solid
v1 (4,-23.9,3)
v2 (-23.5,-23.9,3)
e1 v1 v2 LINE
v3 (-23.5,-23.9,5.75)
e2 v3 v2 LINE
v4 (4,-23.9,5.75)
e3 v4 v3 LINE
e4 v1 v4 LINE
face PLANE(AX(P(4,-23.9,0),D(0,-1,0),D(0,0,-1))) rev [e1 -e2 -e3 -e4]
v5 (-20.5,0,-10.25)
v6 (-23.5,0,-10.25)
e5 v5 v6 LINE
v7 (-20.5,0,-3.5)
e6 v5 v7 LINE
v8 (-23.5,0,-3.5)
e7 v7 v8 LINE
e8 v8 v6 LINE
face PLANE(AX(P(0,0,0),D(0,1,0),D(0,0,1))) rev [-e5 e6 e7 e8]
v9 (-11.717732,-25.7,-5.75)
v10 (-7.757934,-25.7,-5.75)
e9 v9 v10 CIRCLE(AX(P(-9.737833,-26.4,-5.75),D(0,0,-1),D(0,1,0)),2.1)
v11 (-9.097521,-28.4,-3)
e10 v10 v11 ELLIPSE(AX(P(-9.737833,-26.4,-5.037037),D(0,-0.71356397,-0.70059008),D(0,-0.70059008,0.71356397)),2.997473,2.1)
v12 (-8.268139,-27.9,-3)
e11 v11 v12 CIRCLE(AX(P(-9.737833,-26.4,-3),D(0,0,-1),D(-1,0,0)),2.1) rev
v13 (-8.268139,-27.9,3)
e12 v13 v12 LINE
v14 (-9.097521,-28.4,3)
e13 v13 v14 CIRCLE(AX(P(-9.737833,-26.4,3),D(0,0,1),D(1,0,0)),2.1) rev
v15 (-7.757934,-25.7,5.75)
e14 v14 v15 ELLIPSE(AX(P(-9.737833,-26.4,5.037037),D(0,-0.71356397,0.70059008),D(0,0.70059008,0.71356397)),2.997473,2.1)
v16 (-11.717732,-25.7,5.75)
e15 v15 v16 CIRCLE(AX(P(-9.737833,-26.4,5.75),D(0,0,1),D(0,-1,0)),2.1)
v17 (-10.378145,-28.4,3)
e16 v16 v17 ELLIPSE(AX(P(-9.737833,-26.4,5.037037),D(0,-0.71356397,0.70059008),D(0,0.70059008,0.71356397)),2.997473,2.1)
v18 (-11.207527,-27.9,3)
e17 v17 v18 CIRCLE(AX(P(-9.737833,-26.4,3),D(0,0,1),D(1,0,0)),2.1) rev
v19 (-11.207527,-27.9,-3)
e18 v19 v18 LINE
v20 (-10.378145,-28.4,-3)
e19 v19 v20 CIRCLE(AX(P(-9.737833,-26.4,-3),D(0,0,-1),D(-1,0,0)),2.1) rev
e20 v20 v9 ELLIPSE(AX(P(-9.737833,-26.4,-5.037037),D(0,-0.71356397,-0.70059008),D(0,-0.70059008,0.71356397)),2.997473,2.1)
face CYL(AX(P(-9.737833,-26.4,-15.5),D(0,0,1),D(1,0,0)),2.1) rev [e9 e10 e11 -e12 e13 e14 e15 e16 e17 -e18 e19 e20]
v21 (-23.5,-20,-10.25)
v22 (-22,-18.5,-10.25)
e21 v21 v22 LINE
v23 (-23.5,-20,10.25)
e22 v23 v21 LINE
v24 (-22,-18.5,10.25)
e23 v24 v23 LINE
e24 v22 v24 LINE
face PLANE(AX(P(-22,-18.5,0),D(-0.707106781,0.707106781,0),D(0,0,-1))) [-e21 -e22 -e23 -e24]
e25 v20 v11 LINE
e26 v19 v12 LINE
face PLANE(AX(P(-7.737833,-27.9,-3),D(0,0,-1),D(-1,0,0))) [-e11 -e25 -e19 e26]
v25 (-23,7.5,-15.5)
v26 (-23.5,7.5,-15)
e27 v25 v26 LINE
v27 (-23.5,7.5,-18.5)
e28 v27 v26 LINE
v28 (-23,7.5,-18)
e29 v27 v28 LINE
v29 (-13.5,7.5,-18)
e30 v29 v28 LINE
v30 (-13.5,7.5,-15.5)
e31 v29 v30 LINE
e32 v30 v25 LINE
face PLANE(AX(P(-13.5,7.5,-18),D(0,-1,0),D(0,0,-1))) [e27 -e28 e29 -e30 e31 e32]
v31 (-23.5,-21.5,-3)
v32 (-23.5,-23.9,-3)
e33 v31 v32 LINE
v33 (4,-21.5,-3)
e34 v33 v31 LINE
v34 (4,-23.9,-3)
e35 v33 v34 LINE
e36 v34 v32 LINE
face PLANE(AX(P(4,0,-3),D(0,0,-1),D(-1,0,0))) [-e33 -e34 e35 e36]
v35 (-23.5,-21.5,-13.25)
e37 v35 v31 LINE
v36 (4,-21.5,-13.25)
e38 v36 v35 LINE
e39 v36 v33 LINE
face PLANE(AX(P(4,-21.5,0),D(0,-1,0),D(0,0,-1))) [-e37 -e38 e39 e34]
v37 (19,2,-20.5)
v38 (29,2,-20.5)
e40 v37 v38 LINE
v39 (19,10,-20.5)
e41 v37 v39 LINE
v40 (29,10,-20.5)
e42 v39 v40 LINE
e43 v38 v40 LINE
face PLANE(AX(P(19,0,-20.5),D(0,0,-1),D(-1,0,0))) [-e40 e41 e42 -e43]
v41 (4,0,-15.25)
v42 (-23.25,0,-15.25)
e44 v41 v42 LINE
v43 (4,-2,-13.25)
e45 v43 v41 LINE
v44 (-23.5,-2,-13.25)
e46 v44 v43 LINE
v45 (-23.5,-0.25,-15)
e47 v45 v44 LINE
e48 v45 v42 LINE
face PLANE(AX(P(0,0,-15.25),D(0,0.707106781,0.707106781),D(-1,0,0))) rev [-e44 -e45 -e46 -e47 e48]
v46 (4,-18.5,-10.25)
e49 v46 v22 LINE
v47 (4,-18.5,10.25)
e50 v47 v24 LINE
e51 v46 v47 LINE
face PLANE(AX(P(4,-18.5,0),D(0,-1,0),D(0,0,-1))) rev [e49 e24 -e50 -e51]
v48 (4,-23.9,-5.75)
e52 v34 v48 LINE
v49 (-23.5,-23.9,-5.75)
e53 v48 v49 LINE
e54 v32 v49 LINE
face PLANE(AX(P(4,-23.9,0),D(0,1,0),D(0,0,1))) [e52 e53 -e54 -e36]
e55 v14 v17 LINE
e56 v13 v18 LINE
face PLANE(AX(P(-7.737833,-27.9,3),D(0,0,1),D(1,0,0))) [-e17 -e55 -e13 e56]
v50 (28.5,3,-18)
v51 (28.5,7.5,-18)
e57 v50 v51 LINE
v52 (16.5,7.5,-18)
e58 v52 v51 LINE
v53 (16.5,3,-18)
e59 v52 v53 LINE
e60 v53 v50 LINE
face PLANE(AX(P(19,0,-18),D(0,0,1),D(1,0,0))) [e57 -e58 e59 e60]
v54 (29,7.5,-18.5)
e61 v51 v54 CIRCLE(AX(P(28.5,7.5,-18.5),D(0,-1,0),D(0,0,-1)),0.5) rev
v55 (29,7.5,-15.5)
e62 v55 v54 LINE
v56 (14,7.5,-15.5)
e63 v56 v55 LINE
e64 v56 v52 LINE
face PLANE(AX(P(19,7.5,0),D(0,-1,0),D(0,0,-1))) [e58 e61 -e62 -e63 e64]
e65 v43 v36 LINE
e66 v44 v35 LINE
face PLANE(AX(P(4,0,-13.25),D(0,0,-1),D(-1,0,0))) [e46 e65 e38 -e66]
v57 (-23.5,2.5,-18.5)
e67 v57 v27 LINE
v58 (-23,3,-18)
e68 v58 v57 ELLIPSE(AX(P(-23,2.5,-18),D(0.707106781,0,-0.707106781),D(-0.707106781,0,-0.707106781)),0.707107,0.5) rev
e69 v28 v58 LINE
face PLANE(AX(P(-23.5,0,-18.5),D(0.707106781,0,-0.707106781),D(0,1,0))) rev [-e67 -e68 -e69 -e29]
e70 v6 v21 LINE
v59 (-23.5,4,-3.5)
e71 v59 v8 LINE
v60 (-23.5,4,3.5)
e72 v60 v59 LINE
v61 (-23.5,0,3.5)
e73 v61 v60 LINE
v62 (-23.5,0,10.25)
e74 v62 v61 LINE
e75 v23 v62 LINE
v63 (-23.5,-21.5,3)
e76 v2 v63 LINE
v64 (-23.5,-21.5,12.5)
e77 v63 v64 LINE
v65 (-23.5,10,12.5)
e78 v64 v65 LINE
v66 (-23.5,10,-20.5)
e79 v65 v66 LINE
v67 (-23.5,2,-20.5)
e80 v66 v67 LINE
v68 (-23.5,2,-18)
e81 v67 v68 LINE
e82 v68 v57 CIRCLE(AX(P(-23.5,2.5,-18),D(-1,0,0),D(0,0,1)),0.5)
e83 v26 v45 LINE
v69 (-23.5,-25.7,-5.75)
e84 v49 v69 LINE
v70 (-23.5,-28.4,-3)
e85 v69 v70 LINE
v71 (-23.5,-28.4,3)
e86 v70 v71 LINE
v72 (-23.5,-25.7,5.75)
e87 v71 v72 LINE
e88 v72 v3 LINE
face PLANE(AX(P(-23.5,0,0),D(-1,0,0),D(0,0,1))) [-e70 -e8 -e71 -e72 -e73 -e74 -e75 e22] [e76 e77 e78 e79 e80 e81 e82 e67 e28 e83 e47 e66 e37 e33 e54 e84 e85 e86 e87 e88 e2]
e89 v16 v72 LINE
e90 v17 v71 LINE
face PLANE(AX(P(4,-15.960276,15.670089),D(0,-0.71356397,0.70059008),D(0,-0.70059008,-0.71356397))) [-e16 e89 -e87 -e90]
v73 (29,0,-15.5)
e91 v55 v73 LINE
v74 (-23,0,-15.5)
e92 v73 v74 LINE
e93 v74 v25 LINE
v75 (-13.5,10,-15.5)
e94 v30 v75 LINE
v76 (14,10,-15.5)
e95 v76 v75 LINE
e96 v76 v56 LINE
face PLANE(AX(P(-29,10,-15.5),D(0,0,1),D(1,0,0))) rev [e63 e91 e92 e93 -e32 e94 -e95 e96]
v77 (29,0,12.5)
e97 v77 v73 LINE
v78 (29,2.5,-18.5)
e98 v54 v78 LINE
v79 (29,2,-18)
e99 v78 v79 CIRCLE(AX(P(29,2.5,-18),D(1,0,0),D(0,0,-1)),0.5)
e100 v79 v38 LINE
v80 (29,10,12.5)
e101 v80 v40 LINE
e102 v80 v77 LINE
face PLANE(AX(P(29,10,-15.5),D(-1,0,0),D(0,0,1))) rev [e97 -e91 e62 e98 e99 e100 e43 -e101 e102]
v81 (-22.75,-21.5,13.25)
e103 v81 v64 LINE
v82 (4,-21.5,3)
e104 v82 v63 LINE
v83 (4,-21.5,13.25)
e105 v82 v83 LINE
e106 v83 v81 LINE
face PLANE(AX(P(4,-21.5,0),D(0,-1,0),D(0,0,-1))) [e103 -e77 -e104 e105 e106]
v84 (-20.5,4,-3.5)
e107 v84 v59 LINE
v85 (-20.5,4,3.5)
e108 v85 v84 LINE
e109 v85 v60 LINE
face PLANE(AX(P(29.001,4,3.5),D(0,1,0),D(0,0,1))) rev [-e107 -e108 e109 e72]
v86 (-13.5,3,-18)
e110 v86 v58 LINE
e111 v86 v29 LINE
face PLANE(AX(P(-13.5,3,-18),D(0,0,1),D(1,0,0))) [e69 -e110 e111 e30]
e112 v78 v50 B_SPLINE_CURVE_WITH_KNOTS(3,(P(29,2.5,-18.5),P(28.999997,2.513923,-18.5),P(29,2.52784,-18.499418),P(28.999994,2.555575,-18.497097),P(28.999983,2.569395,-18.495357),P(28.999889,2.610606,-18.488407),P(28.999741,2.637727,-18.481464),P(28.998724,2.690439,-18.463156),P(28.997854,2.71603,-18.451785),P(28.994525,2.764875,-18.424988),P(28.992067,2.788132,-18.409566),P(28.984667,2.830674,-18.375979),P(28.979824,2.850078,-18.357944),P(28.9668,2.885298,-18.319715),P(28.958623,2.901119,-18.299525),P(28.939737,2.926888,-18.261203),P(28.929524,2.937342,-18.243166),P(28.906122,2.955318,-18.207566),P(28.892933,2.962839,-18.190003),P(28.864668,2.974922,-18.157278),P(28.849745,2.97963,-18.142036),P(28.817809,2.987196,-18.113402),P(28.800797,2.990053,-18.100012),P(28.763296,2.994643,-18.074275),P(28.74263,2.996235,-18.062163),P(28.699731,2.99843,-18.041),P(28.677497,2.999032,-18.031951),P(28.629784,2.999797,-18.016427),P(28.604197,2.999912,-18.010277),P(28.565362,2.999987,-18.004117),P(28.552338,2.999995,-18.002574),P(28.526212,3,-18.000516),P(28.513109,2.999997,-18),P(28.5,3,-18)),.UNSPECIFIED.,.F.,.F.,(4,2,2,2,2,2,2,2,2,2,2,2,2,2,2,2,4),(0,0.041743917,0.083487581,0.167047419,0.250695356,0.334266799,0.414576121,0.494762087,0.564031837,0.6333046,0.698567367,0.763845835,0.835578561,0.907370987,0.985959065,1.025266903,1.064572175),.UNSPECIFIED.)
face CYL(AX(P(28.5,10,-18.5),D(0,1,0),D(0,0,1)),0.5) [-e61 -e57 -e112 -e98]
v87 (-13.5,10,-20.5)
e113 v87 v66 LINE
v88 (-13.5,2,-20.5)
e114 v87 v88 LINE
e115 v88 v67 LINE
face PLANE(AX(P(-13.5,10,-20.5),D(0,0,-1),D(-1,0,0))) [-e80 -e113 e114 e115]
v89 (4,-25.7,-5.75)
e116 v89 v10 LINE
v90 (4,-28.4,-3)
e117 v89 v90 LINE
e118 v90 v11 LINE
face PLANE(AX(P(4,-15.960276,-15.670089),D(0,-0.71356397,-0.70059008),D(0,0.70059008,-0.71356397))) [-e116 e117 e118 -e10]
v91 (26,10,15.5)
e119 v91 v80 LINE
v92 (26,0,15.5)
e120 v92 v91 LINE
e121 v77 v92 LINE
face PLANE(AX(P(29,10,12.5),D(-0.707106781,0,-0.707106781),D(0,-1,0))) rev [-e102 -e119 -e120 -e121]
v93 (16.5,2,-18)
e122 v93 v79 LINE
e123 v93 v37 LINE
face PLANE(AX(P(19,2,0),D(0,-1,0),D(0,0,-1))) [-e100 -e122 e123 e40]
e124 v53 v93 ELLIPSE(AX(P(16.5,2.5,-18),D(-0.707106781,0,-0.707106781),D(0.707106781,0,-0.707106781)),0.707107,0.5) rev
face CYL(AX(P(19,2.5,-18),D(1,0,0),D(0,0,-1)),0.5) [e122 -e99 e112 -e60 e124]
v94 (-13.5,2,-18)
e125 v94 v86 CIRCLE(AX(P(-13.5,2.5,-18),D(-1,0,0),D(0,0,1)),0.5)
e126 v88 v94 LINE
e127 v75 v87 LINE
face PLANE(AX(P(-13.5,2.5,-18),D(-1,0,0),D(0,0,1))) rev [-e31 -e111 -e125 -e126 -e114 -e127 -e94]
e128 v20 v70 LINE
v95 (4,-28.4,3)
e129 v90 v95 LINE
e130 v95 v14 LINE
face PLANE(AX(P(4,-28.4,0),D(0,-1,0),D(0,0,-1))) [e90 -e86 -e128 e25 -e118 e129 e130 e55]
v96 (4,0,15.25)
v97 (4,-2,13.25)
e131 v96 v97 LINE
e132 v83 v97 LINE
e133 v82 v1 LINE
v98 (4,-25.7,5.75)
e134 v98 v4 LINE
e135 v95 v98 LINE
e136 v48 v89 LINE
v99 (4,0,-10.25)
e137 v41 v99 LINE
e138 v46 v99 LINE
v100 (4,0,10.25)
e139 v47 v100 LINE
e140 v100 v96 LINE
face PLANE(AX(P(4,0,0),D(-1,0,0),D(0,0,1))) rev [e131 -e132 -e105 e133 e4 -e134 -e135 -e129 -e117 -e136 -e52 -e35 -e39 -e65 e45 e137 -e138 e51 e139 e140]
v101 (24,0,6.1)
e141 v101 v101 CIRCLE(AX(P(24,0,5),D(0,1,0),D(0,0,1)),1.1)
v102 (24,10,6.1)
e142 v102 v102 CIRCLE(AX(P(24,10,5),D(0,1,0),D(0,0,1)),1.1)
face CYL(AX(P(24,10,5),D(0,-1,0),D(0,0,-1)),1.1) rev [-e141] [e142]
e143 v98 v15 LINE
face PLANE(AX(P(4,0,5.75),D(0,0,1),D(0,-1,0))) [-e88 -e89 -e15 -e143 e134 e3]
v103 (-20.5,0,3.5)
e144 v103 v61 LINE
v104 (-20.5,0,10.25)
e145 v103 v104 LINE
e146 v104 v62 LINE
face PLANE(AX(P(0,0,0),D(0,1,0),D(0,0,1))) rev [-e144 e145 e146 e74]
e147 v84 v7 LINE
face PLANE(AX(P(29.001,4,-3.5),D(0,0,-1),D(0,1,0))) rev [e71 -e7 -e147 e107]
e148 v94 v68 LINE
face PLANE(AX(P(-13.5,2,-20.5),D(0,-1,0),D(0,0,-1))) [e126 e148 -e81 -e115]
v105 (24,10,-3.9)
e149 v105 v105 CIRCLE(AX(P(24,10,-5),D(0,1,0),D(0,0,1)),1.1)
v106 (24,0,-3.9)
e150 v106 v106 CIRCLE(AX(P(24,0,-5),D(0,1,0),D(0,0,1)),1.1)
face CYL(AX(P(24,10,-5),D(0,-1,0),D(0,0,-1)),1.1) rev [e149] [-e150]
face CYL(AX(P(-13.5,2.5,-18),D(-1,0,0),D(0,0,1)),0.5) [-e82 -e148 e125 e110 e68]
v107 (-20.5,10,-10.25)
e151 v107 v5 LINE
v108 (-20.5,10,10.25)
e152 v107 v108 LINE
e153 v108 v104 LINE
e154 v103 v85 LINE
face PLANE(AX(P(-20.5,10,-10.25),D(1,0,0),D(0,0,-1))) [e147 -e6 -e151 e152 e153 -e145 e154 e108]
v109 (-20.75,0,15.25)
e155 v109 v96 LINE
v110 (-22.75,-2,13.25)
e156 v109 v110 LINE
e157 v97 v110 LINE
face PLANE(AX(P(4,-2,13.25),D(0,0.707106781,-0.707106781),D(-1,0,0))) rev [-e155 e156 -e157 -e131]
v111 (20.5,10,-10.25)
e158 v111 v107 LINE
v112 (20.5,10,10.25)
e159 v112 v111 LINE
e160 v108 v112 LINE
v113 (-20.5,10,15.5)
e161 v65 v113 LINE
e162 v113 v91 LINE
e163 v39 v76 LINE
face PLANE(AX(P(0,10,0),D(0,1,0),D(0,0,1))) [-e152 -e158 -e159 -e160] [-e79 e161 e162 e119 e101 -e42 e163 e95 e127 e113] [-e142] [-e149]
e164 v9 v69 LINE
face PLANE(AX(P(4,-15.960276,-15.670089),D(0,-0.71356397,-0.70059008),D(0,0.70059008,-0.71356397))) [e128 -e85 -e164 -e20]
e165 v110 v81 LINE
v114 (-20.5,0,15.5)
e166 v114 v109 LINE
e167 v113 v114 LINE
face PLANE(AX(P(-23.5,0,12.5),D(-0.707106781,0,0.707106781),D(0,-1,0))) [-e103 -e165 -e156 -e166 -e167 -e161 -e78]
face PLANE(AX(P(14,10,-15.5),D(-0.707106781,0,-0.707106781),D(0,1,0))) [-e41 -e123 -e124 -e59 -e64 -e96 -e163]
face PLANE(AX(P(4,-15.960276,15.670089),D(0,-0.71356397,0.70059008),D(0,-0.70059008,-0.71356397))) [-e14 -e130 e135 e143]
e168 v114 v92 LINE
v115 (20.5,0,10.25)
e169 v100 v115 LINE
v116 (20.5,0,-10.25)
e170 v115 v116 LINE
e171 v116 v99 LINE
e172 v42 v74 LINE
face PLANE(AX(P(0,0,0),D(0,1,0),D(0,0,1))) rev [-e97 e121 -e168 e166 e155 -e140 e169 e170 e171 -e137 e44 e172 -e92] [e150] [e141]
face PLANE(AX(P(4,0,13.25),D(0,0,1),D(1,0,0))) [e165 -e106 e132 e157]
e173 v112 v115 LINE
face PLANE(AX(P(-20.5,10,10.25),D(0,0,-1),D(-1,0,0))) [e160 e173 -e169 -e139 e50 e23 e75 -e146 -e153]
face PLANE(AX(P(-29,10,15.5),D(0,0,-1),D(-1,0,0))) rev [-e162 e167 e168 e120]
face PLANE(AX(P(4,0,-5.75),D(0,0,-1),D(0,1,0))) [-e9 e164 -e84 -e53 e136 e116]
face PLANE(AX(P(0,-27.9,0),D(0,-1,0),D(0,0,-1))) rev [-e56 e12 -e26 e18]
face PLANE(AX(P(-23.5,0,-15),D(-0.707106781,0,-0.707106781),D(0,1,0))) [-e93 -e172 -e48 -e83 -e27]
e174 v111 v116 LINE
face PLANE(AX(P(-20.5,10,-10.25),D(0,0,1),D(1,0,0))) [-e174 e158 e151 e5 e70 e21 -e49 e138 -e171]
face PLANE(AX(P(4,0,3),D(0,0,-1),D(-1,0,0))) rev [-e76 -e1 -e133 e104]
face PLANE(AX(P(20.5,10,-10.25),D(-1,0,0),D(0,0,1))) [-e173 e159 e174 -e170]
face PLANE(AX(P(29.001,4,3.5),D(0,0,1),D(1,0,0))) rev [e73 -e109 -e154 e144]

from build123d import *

# Parameters (mm, degrees)
CROQUIS1_W              = 58
CROQUIS1_H              = 31
CROQUIS1_R              = 1.1
CROQUIS1_W_2            = 41
CROQUIS1_H_2            = 20.5
SALIENTE_EXTRUIR1_DEPTH = 10
SALIENTE_EXTRUIR2_DEPTH = 33
CROQUIS3_R              = 2.1
CORTAR_EXTRUIR1_DEPTH   = 50.740551867
CROQUIS4_W              = 20.5
CROQUIS4_H              = 18.5
CORTAR_EXTRUIR2_DEPTH   = 5.5
CHAFL_N1_SIZE           = 1.5
CHAFL_N2_SIZE           = 2
CROQUIS5_W              = 3
CROQUIS5_H              = 20.5
SALIENTE_EXTRUIR3_DEPTH = 10
CORTAR_EXTRUIR3_REACH   = 63.669
CROQUIS6_W              = 7
CROQUIS6_H              = 4
CROQUIS7_W              = 4
CROQUIS7_H              = 6
SALIENTE_EXTRUIR4_DEPTH = 0.5
CHAFL_N3_SIZE           = 3
SALIENTE_EXTRUIR5_DEPTH = 10
REDONDEO1_R             = 0.5
SALIENTE_EXTRUIR6_START = -10
SALIENTE_EXTRUIR6_DEPTH = 10
CHAFL_N5_SIZE           = 0.5
CHAFL_N6_SIZE           = 5


with BuildPart() as part:
    # Croquis1 → Saliente-Extruir1 (new body)
    with BuildSketch(Plane(origin=(0, 0, 0), x_dir=(1, 0, 0), z_dir=(0, 1, 0))):
        Rectangle(CROQUIS1_W, CROQUIS1_H)
        with Locations(Location((-24, -5, 0), (0, 0, 270))):
            Circle(CROQUIS1_R, mode=Mode.SUBTRACT)
        with Locations(Location((24, -5, 0), (0, 0, 270))):
            Circle(CROQUIS1_R, mode=Mode.SUBTRACT)
        with Locations(Location((24, 5, 0), (0, 0, 270))):
            Circle(CROQUIS1_R, mode=Mode.SUBTRACT)
        with Locations(Location((-24, 5, 0), (0, 0, 270))):
            Circle(CROQUIS1_R, mode=Mode.SUBTRACT)
        Rectangle(CROQUIS1_W_2, CROQUIS1_H_2, mode=Mode.SUBTRACT)
    extrude(amount=SALIENTE_EXTRUIR1_DEPTH)

    # Croquis2 → Saliente-Extruir2 (add)
    with BuildSketch(Plane.ZY.offset(29)):
        Polygon((10.25, -18.5), (-10.25, -18.5), (-10.25, 0), (-13.25, 0), (-13.25, -21.5), (-3, -21.5), (-3, -23.9), (-5.75, -23.9), (-5.75, -25.7), (-3, -28.4), (3, -28.4), (5.75, -25.7), (5.75, -23.9), (3, -23.9), (3, -21.5), (13.25, -21.5), (13.25, 0), (10.25, 0), align=None)
    extrude(amount=-SALIENTE_EXTRUIR2_DEPTH)

    # Croquis3 → Cortar-Extruir1 (cut, through all)
    with BuildSketch(Plane.XY.offset(13.25)):
        with Locations((-9.737832968, -26.4)):
            Circle(CROQUIS3_R)
    extrude(amount=-CORTAR_EXTRUIR1_DEPTH, mode=Mode.SUBTRACT)

    # Croquis4 → Cortar-Extruir2 (cut)
    with BuildSketch(Plane.ZY.offset(29)):
        Polygon((-15.5, 0), (-13.25, 0), (-13.25, -21.5), (-3, -21.5), (-3, -23.9), (-5.75, -23.9), (-5.75, -25.7), (-3, -28.4), (3, -28.4), (5.75, -25.7), (5.75, -23.9), (3, -23.9), (3, -21.5), (13.25, -21.5), (13.25, 0), (15.5, 0), (15.5, 10), (-15.5, 10), align=None)
        with Locations((0, -9.25)):
            Rectangle(CROQUIS4_W, CROQUIS4_H, mode=Mode.SUBTRACT)
    extrude(amount=-CORTAR_EXTRUIR2_DEPTH, mode=Mode.SUBTRACT)

    # Chaflán1
    chafl_n1_edges = [part.edges().sort_by_distance(p)[0] for p in [
        (-23.5, -18.5, 0),
    ]]
    chamfer(chafl_n1_edges, length=CHAFL_N1_SIZE)

    # Chaflán2
    chafl_n2_edges = [part.edges().sort_by_distance(p)[0] for p in [
        (-9.75, 0, -13.25),
        (-9.75, 0, 13.25),
    ]]
    chamfer(chafl_n2_edges, length=CHAFL_N2_SIZE)

    # Croquis5 → Saliente-Extruir3 (add)
    with BuildSketch(Plane.XZ):
        with Locations((-22, 0)):
            Rectangle(CROQUIS5_W, CROQUIS5_H)
    extrude(amount=-SALIENTE_EXTRUIR3_DEPTH)

    # Croquis6 → Cortar-Extruir3 (cut, up to next)
    with BuildSketch(Plane.ZY.offset(23.5), mode=Mode.PRIVATE) as cortar_extruir3_sk1:
        with Locations((0, 2)):
            Rectangle(CROQUIS6_W, CROQUIS6_H)
    cortar_extruir3_tool1 = extrude(cortar_extruir3_sk1.sketch, amount=-CORTAR_EXTRUIR3_REACH, mode=Mode.PRIVATE) & part.part
    add(cortar_extruir3_tool1.solids().sort_by_distance((-23.5, 2, 0))[0], mode=Mode.SUBTRACT)

    # Croquis7 → Saliente-Extruir4 (add)
    with BuildSketch(Plane.XZ.offset(28.4)):
        with Locations((-9.737832968, 0)):
            Rectangle(CROQUIS7_W, CROQUIS7_H)
    extrude(amount=-SALIENTE_EXTRUIR4_DEPTH)

    # Chaflán3
    chafl_n3_edges = [part.edges().sort_by_distance(p)[0] for p in [
        (-23.5, 5, 15.5),
        (29, 5, 15.5),
    ]]
    chamfer(chafl_n3_edges, length=CHAFL_N3_SIZE)

    # Croquis8 → Saliente-Extruir5 (add)
    with BuildSketch(Plane(origin=(29, 0, 0), x_dir=(0, 0, -1), z_dir=(1, 0, 0))):
        with BuildLine():
            Line((18, 7.5), (18, 3))
            ThreePointArc((18, 3), (17.5, 2.5), (18, 2))
            Line((18, 2), (20.5, 2))
            Line((20.5, 2), (20.5, 10))
            Line((20.5, 10), (15.5, 10))
            Line((15.5, 10), (15.5, 7.5))
            Line((15.5, 7.5), (18, 7.5))
        make_face()
    extrude(amount=-SALIENTE_EXTRUIR5_DEPTH)

    # Redondeo1
    redondeo1_edges = [part.edges().sort_by_distance(p)[0] for p in [
        (29, 5.25, -18),
    ]]
    fillet(redondeo1_edges, radius=REDONDEO1_R - 0.0001)  # a hair under: the kernel refuses the full size

    # Croquis9 → Saliente-Extruir6 (add)
    with BuildSketch(Plane.ZY.offset(23.5).offset(SALIENTE_EXTRUIR6_START)):
        with BuildLine():
            Line((-18, 3), (-18, 7.5))
            Line((-18, 7.5), (-15.5, 7.5))
            Line((-15.5, 7.5), (-15.5, 10))
            Line((-15.5, 10), (-20.5, 10))
            Line((-20.5, 10), (-20.5, 2))
            Line((-20.5, 2), (-18, 2))
            ThreePointArc((-18, 2), (-17.5, 2.5), (-18, 3))
        make_face()
    extrude(amount=SALIENTE_EXTRUIR6_DEPTH)

    # Chaflán5
    chafl_n5_edges = [part.edges().sort_by_distance(p)[0] for p in [
        (-23.5, 3.75, -15.5),
        (-23.5, 5.25, -18),
    ]]
    chamfer(chafl_n5_edges, length=CHAFL_N5_SIZE - 0.0001)  # a hair under: the kernel refuses the full size

    # Chaflán6
    chafl_n6_edges = [part.edges().sort_by_distance(p)[0] for p in [
        (19, 8.75, -15.5),
    ]]
    chamfer(chafl_n6_edges, length=CHAFL_N6_SIZE - 0.0001)  # a hair under: the kernel refuses the full size


solid = part.part
